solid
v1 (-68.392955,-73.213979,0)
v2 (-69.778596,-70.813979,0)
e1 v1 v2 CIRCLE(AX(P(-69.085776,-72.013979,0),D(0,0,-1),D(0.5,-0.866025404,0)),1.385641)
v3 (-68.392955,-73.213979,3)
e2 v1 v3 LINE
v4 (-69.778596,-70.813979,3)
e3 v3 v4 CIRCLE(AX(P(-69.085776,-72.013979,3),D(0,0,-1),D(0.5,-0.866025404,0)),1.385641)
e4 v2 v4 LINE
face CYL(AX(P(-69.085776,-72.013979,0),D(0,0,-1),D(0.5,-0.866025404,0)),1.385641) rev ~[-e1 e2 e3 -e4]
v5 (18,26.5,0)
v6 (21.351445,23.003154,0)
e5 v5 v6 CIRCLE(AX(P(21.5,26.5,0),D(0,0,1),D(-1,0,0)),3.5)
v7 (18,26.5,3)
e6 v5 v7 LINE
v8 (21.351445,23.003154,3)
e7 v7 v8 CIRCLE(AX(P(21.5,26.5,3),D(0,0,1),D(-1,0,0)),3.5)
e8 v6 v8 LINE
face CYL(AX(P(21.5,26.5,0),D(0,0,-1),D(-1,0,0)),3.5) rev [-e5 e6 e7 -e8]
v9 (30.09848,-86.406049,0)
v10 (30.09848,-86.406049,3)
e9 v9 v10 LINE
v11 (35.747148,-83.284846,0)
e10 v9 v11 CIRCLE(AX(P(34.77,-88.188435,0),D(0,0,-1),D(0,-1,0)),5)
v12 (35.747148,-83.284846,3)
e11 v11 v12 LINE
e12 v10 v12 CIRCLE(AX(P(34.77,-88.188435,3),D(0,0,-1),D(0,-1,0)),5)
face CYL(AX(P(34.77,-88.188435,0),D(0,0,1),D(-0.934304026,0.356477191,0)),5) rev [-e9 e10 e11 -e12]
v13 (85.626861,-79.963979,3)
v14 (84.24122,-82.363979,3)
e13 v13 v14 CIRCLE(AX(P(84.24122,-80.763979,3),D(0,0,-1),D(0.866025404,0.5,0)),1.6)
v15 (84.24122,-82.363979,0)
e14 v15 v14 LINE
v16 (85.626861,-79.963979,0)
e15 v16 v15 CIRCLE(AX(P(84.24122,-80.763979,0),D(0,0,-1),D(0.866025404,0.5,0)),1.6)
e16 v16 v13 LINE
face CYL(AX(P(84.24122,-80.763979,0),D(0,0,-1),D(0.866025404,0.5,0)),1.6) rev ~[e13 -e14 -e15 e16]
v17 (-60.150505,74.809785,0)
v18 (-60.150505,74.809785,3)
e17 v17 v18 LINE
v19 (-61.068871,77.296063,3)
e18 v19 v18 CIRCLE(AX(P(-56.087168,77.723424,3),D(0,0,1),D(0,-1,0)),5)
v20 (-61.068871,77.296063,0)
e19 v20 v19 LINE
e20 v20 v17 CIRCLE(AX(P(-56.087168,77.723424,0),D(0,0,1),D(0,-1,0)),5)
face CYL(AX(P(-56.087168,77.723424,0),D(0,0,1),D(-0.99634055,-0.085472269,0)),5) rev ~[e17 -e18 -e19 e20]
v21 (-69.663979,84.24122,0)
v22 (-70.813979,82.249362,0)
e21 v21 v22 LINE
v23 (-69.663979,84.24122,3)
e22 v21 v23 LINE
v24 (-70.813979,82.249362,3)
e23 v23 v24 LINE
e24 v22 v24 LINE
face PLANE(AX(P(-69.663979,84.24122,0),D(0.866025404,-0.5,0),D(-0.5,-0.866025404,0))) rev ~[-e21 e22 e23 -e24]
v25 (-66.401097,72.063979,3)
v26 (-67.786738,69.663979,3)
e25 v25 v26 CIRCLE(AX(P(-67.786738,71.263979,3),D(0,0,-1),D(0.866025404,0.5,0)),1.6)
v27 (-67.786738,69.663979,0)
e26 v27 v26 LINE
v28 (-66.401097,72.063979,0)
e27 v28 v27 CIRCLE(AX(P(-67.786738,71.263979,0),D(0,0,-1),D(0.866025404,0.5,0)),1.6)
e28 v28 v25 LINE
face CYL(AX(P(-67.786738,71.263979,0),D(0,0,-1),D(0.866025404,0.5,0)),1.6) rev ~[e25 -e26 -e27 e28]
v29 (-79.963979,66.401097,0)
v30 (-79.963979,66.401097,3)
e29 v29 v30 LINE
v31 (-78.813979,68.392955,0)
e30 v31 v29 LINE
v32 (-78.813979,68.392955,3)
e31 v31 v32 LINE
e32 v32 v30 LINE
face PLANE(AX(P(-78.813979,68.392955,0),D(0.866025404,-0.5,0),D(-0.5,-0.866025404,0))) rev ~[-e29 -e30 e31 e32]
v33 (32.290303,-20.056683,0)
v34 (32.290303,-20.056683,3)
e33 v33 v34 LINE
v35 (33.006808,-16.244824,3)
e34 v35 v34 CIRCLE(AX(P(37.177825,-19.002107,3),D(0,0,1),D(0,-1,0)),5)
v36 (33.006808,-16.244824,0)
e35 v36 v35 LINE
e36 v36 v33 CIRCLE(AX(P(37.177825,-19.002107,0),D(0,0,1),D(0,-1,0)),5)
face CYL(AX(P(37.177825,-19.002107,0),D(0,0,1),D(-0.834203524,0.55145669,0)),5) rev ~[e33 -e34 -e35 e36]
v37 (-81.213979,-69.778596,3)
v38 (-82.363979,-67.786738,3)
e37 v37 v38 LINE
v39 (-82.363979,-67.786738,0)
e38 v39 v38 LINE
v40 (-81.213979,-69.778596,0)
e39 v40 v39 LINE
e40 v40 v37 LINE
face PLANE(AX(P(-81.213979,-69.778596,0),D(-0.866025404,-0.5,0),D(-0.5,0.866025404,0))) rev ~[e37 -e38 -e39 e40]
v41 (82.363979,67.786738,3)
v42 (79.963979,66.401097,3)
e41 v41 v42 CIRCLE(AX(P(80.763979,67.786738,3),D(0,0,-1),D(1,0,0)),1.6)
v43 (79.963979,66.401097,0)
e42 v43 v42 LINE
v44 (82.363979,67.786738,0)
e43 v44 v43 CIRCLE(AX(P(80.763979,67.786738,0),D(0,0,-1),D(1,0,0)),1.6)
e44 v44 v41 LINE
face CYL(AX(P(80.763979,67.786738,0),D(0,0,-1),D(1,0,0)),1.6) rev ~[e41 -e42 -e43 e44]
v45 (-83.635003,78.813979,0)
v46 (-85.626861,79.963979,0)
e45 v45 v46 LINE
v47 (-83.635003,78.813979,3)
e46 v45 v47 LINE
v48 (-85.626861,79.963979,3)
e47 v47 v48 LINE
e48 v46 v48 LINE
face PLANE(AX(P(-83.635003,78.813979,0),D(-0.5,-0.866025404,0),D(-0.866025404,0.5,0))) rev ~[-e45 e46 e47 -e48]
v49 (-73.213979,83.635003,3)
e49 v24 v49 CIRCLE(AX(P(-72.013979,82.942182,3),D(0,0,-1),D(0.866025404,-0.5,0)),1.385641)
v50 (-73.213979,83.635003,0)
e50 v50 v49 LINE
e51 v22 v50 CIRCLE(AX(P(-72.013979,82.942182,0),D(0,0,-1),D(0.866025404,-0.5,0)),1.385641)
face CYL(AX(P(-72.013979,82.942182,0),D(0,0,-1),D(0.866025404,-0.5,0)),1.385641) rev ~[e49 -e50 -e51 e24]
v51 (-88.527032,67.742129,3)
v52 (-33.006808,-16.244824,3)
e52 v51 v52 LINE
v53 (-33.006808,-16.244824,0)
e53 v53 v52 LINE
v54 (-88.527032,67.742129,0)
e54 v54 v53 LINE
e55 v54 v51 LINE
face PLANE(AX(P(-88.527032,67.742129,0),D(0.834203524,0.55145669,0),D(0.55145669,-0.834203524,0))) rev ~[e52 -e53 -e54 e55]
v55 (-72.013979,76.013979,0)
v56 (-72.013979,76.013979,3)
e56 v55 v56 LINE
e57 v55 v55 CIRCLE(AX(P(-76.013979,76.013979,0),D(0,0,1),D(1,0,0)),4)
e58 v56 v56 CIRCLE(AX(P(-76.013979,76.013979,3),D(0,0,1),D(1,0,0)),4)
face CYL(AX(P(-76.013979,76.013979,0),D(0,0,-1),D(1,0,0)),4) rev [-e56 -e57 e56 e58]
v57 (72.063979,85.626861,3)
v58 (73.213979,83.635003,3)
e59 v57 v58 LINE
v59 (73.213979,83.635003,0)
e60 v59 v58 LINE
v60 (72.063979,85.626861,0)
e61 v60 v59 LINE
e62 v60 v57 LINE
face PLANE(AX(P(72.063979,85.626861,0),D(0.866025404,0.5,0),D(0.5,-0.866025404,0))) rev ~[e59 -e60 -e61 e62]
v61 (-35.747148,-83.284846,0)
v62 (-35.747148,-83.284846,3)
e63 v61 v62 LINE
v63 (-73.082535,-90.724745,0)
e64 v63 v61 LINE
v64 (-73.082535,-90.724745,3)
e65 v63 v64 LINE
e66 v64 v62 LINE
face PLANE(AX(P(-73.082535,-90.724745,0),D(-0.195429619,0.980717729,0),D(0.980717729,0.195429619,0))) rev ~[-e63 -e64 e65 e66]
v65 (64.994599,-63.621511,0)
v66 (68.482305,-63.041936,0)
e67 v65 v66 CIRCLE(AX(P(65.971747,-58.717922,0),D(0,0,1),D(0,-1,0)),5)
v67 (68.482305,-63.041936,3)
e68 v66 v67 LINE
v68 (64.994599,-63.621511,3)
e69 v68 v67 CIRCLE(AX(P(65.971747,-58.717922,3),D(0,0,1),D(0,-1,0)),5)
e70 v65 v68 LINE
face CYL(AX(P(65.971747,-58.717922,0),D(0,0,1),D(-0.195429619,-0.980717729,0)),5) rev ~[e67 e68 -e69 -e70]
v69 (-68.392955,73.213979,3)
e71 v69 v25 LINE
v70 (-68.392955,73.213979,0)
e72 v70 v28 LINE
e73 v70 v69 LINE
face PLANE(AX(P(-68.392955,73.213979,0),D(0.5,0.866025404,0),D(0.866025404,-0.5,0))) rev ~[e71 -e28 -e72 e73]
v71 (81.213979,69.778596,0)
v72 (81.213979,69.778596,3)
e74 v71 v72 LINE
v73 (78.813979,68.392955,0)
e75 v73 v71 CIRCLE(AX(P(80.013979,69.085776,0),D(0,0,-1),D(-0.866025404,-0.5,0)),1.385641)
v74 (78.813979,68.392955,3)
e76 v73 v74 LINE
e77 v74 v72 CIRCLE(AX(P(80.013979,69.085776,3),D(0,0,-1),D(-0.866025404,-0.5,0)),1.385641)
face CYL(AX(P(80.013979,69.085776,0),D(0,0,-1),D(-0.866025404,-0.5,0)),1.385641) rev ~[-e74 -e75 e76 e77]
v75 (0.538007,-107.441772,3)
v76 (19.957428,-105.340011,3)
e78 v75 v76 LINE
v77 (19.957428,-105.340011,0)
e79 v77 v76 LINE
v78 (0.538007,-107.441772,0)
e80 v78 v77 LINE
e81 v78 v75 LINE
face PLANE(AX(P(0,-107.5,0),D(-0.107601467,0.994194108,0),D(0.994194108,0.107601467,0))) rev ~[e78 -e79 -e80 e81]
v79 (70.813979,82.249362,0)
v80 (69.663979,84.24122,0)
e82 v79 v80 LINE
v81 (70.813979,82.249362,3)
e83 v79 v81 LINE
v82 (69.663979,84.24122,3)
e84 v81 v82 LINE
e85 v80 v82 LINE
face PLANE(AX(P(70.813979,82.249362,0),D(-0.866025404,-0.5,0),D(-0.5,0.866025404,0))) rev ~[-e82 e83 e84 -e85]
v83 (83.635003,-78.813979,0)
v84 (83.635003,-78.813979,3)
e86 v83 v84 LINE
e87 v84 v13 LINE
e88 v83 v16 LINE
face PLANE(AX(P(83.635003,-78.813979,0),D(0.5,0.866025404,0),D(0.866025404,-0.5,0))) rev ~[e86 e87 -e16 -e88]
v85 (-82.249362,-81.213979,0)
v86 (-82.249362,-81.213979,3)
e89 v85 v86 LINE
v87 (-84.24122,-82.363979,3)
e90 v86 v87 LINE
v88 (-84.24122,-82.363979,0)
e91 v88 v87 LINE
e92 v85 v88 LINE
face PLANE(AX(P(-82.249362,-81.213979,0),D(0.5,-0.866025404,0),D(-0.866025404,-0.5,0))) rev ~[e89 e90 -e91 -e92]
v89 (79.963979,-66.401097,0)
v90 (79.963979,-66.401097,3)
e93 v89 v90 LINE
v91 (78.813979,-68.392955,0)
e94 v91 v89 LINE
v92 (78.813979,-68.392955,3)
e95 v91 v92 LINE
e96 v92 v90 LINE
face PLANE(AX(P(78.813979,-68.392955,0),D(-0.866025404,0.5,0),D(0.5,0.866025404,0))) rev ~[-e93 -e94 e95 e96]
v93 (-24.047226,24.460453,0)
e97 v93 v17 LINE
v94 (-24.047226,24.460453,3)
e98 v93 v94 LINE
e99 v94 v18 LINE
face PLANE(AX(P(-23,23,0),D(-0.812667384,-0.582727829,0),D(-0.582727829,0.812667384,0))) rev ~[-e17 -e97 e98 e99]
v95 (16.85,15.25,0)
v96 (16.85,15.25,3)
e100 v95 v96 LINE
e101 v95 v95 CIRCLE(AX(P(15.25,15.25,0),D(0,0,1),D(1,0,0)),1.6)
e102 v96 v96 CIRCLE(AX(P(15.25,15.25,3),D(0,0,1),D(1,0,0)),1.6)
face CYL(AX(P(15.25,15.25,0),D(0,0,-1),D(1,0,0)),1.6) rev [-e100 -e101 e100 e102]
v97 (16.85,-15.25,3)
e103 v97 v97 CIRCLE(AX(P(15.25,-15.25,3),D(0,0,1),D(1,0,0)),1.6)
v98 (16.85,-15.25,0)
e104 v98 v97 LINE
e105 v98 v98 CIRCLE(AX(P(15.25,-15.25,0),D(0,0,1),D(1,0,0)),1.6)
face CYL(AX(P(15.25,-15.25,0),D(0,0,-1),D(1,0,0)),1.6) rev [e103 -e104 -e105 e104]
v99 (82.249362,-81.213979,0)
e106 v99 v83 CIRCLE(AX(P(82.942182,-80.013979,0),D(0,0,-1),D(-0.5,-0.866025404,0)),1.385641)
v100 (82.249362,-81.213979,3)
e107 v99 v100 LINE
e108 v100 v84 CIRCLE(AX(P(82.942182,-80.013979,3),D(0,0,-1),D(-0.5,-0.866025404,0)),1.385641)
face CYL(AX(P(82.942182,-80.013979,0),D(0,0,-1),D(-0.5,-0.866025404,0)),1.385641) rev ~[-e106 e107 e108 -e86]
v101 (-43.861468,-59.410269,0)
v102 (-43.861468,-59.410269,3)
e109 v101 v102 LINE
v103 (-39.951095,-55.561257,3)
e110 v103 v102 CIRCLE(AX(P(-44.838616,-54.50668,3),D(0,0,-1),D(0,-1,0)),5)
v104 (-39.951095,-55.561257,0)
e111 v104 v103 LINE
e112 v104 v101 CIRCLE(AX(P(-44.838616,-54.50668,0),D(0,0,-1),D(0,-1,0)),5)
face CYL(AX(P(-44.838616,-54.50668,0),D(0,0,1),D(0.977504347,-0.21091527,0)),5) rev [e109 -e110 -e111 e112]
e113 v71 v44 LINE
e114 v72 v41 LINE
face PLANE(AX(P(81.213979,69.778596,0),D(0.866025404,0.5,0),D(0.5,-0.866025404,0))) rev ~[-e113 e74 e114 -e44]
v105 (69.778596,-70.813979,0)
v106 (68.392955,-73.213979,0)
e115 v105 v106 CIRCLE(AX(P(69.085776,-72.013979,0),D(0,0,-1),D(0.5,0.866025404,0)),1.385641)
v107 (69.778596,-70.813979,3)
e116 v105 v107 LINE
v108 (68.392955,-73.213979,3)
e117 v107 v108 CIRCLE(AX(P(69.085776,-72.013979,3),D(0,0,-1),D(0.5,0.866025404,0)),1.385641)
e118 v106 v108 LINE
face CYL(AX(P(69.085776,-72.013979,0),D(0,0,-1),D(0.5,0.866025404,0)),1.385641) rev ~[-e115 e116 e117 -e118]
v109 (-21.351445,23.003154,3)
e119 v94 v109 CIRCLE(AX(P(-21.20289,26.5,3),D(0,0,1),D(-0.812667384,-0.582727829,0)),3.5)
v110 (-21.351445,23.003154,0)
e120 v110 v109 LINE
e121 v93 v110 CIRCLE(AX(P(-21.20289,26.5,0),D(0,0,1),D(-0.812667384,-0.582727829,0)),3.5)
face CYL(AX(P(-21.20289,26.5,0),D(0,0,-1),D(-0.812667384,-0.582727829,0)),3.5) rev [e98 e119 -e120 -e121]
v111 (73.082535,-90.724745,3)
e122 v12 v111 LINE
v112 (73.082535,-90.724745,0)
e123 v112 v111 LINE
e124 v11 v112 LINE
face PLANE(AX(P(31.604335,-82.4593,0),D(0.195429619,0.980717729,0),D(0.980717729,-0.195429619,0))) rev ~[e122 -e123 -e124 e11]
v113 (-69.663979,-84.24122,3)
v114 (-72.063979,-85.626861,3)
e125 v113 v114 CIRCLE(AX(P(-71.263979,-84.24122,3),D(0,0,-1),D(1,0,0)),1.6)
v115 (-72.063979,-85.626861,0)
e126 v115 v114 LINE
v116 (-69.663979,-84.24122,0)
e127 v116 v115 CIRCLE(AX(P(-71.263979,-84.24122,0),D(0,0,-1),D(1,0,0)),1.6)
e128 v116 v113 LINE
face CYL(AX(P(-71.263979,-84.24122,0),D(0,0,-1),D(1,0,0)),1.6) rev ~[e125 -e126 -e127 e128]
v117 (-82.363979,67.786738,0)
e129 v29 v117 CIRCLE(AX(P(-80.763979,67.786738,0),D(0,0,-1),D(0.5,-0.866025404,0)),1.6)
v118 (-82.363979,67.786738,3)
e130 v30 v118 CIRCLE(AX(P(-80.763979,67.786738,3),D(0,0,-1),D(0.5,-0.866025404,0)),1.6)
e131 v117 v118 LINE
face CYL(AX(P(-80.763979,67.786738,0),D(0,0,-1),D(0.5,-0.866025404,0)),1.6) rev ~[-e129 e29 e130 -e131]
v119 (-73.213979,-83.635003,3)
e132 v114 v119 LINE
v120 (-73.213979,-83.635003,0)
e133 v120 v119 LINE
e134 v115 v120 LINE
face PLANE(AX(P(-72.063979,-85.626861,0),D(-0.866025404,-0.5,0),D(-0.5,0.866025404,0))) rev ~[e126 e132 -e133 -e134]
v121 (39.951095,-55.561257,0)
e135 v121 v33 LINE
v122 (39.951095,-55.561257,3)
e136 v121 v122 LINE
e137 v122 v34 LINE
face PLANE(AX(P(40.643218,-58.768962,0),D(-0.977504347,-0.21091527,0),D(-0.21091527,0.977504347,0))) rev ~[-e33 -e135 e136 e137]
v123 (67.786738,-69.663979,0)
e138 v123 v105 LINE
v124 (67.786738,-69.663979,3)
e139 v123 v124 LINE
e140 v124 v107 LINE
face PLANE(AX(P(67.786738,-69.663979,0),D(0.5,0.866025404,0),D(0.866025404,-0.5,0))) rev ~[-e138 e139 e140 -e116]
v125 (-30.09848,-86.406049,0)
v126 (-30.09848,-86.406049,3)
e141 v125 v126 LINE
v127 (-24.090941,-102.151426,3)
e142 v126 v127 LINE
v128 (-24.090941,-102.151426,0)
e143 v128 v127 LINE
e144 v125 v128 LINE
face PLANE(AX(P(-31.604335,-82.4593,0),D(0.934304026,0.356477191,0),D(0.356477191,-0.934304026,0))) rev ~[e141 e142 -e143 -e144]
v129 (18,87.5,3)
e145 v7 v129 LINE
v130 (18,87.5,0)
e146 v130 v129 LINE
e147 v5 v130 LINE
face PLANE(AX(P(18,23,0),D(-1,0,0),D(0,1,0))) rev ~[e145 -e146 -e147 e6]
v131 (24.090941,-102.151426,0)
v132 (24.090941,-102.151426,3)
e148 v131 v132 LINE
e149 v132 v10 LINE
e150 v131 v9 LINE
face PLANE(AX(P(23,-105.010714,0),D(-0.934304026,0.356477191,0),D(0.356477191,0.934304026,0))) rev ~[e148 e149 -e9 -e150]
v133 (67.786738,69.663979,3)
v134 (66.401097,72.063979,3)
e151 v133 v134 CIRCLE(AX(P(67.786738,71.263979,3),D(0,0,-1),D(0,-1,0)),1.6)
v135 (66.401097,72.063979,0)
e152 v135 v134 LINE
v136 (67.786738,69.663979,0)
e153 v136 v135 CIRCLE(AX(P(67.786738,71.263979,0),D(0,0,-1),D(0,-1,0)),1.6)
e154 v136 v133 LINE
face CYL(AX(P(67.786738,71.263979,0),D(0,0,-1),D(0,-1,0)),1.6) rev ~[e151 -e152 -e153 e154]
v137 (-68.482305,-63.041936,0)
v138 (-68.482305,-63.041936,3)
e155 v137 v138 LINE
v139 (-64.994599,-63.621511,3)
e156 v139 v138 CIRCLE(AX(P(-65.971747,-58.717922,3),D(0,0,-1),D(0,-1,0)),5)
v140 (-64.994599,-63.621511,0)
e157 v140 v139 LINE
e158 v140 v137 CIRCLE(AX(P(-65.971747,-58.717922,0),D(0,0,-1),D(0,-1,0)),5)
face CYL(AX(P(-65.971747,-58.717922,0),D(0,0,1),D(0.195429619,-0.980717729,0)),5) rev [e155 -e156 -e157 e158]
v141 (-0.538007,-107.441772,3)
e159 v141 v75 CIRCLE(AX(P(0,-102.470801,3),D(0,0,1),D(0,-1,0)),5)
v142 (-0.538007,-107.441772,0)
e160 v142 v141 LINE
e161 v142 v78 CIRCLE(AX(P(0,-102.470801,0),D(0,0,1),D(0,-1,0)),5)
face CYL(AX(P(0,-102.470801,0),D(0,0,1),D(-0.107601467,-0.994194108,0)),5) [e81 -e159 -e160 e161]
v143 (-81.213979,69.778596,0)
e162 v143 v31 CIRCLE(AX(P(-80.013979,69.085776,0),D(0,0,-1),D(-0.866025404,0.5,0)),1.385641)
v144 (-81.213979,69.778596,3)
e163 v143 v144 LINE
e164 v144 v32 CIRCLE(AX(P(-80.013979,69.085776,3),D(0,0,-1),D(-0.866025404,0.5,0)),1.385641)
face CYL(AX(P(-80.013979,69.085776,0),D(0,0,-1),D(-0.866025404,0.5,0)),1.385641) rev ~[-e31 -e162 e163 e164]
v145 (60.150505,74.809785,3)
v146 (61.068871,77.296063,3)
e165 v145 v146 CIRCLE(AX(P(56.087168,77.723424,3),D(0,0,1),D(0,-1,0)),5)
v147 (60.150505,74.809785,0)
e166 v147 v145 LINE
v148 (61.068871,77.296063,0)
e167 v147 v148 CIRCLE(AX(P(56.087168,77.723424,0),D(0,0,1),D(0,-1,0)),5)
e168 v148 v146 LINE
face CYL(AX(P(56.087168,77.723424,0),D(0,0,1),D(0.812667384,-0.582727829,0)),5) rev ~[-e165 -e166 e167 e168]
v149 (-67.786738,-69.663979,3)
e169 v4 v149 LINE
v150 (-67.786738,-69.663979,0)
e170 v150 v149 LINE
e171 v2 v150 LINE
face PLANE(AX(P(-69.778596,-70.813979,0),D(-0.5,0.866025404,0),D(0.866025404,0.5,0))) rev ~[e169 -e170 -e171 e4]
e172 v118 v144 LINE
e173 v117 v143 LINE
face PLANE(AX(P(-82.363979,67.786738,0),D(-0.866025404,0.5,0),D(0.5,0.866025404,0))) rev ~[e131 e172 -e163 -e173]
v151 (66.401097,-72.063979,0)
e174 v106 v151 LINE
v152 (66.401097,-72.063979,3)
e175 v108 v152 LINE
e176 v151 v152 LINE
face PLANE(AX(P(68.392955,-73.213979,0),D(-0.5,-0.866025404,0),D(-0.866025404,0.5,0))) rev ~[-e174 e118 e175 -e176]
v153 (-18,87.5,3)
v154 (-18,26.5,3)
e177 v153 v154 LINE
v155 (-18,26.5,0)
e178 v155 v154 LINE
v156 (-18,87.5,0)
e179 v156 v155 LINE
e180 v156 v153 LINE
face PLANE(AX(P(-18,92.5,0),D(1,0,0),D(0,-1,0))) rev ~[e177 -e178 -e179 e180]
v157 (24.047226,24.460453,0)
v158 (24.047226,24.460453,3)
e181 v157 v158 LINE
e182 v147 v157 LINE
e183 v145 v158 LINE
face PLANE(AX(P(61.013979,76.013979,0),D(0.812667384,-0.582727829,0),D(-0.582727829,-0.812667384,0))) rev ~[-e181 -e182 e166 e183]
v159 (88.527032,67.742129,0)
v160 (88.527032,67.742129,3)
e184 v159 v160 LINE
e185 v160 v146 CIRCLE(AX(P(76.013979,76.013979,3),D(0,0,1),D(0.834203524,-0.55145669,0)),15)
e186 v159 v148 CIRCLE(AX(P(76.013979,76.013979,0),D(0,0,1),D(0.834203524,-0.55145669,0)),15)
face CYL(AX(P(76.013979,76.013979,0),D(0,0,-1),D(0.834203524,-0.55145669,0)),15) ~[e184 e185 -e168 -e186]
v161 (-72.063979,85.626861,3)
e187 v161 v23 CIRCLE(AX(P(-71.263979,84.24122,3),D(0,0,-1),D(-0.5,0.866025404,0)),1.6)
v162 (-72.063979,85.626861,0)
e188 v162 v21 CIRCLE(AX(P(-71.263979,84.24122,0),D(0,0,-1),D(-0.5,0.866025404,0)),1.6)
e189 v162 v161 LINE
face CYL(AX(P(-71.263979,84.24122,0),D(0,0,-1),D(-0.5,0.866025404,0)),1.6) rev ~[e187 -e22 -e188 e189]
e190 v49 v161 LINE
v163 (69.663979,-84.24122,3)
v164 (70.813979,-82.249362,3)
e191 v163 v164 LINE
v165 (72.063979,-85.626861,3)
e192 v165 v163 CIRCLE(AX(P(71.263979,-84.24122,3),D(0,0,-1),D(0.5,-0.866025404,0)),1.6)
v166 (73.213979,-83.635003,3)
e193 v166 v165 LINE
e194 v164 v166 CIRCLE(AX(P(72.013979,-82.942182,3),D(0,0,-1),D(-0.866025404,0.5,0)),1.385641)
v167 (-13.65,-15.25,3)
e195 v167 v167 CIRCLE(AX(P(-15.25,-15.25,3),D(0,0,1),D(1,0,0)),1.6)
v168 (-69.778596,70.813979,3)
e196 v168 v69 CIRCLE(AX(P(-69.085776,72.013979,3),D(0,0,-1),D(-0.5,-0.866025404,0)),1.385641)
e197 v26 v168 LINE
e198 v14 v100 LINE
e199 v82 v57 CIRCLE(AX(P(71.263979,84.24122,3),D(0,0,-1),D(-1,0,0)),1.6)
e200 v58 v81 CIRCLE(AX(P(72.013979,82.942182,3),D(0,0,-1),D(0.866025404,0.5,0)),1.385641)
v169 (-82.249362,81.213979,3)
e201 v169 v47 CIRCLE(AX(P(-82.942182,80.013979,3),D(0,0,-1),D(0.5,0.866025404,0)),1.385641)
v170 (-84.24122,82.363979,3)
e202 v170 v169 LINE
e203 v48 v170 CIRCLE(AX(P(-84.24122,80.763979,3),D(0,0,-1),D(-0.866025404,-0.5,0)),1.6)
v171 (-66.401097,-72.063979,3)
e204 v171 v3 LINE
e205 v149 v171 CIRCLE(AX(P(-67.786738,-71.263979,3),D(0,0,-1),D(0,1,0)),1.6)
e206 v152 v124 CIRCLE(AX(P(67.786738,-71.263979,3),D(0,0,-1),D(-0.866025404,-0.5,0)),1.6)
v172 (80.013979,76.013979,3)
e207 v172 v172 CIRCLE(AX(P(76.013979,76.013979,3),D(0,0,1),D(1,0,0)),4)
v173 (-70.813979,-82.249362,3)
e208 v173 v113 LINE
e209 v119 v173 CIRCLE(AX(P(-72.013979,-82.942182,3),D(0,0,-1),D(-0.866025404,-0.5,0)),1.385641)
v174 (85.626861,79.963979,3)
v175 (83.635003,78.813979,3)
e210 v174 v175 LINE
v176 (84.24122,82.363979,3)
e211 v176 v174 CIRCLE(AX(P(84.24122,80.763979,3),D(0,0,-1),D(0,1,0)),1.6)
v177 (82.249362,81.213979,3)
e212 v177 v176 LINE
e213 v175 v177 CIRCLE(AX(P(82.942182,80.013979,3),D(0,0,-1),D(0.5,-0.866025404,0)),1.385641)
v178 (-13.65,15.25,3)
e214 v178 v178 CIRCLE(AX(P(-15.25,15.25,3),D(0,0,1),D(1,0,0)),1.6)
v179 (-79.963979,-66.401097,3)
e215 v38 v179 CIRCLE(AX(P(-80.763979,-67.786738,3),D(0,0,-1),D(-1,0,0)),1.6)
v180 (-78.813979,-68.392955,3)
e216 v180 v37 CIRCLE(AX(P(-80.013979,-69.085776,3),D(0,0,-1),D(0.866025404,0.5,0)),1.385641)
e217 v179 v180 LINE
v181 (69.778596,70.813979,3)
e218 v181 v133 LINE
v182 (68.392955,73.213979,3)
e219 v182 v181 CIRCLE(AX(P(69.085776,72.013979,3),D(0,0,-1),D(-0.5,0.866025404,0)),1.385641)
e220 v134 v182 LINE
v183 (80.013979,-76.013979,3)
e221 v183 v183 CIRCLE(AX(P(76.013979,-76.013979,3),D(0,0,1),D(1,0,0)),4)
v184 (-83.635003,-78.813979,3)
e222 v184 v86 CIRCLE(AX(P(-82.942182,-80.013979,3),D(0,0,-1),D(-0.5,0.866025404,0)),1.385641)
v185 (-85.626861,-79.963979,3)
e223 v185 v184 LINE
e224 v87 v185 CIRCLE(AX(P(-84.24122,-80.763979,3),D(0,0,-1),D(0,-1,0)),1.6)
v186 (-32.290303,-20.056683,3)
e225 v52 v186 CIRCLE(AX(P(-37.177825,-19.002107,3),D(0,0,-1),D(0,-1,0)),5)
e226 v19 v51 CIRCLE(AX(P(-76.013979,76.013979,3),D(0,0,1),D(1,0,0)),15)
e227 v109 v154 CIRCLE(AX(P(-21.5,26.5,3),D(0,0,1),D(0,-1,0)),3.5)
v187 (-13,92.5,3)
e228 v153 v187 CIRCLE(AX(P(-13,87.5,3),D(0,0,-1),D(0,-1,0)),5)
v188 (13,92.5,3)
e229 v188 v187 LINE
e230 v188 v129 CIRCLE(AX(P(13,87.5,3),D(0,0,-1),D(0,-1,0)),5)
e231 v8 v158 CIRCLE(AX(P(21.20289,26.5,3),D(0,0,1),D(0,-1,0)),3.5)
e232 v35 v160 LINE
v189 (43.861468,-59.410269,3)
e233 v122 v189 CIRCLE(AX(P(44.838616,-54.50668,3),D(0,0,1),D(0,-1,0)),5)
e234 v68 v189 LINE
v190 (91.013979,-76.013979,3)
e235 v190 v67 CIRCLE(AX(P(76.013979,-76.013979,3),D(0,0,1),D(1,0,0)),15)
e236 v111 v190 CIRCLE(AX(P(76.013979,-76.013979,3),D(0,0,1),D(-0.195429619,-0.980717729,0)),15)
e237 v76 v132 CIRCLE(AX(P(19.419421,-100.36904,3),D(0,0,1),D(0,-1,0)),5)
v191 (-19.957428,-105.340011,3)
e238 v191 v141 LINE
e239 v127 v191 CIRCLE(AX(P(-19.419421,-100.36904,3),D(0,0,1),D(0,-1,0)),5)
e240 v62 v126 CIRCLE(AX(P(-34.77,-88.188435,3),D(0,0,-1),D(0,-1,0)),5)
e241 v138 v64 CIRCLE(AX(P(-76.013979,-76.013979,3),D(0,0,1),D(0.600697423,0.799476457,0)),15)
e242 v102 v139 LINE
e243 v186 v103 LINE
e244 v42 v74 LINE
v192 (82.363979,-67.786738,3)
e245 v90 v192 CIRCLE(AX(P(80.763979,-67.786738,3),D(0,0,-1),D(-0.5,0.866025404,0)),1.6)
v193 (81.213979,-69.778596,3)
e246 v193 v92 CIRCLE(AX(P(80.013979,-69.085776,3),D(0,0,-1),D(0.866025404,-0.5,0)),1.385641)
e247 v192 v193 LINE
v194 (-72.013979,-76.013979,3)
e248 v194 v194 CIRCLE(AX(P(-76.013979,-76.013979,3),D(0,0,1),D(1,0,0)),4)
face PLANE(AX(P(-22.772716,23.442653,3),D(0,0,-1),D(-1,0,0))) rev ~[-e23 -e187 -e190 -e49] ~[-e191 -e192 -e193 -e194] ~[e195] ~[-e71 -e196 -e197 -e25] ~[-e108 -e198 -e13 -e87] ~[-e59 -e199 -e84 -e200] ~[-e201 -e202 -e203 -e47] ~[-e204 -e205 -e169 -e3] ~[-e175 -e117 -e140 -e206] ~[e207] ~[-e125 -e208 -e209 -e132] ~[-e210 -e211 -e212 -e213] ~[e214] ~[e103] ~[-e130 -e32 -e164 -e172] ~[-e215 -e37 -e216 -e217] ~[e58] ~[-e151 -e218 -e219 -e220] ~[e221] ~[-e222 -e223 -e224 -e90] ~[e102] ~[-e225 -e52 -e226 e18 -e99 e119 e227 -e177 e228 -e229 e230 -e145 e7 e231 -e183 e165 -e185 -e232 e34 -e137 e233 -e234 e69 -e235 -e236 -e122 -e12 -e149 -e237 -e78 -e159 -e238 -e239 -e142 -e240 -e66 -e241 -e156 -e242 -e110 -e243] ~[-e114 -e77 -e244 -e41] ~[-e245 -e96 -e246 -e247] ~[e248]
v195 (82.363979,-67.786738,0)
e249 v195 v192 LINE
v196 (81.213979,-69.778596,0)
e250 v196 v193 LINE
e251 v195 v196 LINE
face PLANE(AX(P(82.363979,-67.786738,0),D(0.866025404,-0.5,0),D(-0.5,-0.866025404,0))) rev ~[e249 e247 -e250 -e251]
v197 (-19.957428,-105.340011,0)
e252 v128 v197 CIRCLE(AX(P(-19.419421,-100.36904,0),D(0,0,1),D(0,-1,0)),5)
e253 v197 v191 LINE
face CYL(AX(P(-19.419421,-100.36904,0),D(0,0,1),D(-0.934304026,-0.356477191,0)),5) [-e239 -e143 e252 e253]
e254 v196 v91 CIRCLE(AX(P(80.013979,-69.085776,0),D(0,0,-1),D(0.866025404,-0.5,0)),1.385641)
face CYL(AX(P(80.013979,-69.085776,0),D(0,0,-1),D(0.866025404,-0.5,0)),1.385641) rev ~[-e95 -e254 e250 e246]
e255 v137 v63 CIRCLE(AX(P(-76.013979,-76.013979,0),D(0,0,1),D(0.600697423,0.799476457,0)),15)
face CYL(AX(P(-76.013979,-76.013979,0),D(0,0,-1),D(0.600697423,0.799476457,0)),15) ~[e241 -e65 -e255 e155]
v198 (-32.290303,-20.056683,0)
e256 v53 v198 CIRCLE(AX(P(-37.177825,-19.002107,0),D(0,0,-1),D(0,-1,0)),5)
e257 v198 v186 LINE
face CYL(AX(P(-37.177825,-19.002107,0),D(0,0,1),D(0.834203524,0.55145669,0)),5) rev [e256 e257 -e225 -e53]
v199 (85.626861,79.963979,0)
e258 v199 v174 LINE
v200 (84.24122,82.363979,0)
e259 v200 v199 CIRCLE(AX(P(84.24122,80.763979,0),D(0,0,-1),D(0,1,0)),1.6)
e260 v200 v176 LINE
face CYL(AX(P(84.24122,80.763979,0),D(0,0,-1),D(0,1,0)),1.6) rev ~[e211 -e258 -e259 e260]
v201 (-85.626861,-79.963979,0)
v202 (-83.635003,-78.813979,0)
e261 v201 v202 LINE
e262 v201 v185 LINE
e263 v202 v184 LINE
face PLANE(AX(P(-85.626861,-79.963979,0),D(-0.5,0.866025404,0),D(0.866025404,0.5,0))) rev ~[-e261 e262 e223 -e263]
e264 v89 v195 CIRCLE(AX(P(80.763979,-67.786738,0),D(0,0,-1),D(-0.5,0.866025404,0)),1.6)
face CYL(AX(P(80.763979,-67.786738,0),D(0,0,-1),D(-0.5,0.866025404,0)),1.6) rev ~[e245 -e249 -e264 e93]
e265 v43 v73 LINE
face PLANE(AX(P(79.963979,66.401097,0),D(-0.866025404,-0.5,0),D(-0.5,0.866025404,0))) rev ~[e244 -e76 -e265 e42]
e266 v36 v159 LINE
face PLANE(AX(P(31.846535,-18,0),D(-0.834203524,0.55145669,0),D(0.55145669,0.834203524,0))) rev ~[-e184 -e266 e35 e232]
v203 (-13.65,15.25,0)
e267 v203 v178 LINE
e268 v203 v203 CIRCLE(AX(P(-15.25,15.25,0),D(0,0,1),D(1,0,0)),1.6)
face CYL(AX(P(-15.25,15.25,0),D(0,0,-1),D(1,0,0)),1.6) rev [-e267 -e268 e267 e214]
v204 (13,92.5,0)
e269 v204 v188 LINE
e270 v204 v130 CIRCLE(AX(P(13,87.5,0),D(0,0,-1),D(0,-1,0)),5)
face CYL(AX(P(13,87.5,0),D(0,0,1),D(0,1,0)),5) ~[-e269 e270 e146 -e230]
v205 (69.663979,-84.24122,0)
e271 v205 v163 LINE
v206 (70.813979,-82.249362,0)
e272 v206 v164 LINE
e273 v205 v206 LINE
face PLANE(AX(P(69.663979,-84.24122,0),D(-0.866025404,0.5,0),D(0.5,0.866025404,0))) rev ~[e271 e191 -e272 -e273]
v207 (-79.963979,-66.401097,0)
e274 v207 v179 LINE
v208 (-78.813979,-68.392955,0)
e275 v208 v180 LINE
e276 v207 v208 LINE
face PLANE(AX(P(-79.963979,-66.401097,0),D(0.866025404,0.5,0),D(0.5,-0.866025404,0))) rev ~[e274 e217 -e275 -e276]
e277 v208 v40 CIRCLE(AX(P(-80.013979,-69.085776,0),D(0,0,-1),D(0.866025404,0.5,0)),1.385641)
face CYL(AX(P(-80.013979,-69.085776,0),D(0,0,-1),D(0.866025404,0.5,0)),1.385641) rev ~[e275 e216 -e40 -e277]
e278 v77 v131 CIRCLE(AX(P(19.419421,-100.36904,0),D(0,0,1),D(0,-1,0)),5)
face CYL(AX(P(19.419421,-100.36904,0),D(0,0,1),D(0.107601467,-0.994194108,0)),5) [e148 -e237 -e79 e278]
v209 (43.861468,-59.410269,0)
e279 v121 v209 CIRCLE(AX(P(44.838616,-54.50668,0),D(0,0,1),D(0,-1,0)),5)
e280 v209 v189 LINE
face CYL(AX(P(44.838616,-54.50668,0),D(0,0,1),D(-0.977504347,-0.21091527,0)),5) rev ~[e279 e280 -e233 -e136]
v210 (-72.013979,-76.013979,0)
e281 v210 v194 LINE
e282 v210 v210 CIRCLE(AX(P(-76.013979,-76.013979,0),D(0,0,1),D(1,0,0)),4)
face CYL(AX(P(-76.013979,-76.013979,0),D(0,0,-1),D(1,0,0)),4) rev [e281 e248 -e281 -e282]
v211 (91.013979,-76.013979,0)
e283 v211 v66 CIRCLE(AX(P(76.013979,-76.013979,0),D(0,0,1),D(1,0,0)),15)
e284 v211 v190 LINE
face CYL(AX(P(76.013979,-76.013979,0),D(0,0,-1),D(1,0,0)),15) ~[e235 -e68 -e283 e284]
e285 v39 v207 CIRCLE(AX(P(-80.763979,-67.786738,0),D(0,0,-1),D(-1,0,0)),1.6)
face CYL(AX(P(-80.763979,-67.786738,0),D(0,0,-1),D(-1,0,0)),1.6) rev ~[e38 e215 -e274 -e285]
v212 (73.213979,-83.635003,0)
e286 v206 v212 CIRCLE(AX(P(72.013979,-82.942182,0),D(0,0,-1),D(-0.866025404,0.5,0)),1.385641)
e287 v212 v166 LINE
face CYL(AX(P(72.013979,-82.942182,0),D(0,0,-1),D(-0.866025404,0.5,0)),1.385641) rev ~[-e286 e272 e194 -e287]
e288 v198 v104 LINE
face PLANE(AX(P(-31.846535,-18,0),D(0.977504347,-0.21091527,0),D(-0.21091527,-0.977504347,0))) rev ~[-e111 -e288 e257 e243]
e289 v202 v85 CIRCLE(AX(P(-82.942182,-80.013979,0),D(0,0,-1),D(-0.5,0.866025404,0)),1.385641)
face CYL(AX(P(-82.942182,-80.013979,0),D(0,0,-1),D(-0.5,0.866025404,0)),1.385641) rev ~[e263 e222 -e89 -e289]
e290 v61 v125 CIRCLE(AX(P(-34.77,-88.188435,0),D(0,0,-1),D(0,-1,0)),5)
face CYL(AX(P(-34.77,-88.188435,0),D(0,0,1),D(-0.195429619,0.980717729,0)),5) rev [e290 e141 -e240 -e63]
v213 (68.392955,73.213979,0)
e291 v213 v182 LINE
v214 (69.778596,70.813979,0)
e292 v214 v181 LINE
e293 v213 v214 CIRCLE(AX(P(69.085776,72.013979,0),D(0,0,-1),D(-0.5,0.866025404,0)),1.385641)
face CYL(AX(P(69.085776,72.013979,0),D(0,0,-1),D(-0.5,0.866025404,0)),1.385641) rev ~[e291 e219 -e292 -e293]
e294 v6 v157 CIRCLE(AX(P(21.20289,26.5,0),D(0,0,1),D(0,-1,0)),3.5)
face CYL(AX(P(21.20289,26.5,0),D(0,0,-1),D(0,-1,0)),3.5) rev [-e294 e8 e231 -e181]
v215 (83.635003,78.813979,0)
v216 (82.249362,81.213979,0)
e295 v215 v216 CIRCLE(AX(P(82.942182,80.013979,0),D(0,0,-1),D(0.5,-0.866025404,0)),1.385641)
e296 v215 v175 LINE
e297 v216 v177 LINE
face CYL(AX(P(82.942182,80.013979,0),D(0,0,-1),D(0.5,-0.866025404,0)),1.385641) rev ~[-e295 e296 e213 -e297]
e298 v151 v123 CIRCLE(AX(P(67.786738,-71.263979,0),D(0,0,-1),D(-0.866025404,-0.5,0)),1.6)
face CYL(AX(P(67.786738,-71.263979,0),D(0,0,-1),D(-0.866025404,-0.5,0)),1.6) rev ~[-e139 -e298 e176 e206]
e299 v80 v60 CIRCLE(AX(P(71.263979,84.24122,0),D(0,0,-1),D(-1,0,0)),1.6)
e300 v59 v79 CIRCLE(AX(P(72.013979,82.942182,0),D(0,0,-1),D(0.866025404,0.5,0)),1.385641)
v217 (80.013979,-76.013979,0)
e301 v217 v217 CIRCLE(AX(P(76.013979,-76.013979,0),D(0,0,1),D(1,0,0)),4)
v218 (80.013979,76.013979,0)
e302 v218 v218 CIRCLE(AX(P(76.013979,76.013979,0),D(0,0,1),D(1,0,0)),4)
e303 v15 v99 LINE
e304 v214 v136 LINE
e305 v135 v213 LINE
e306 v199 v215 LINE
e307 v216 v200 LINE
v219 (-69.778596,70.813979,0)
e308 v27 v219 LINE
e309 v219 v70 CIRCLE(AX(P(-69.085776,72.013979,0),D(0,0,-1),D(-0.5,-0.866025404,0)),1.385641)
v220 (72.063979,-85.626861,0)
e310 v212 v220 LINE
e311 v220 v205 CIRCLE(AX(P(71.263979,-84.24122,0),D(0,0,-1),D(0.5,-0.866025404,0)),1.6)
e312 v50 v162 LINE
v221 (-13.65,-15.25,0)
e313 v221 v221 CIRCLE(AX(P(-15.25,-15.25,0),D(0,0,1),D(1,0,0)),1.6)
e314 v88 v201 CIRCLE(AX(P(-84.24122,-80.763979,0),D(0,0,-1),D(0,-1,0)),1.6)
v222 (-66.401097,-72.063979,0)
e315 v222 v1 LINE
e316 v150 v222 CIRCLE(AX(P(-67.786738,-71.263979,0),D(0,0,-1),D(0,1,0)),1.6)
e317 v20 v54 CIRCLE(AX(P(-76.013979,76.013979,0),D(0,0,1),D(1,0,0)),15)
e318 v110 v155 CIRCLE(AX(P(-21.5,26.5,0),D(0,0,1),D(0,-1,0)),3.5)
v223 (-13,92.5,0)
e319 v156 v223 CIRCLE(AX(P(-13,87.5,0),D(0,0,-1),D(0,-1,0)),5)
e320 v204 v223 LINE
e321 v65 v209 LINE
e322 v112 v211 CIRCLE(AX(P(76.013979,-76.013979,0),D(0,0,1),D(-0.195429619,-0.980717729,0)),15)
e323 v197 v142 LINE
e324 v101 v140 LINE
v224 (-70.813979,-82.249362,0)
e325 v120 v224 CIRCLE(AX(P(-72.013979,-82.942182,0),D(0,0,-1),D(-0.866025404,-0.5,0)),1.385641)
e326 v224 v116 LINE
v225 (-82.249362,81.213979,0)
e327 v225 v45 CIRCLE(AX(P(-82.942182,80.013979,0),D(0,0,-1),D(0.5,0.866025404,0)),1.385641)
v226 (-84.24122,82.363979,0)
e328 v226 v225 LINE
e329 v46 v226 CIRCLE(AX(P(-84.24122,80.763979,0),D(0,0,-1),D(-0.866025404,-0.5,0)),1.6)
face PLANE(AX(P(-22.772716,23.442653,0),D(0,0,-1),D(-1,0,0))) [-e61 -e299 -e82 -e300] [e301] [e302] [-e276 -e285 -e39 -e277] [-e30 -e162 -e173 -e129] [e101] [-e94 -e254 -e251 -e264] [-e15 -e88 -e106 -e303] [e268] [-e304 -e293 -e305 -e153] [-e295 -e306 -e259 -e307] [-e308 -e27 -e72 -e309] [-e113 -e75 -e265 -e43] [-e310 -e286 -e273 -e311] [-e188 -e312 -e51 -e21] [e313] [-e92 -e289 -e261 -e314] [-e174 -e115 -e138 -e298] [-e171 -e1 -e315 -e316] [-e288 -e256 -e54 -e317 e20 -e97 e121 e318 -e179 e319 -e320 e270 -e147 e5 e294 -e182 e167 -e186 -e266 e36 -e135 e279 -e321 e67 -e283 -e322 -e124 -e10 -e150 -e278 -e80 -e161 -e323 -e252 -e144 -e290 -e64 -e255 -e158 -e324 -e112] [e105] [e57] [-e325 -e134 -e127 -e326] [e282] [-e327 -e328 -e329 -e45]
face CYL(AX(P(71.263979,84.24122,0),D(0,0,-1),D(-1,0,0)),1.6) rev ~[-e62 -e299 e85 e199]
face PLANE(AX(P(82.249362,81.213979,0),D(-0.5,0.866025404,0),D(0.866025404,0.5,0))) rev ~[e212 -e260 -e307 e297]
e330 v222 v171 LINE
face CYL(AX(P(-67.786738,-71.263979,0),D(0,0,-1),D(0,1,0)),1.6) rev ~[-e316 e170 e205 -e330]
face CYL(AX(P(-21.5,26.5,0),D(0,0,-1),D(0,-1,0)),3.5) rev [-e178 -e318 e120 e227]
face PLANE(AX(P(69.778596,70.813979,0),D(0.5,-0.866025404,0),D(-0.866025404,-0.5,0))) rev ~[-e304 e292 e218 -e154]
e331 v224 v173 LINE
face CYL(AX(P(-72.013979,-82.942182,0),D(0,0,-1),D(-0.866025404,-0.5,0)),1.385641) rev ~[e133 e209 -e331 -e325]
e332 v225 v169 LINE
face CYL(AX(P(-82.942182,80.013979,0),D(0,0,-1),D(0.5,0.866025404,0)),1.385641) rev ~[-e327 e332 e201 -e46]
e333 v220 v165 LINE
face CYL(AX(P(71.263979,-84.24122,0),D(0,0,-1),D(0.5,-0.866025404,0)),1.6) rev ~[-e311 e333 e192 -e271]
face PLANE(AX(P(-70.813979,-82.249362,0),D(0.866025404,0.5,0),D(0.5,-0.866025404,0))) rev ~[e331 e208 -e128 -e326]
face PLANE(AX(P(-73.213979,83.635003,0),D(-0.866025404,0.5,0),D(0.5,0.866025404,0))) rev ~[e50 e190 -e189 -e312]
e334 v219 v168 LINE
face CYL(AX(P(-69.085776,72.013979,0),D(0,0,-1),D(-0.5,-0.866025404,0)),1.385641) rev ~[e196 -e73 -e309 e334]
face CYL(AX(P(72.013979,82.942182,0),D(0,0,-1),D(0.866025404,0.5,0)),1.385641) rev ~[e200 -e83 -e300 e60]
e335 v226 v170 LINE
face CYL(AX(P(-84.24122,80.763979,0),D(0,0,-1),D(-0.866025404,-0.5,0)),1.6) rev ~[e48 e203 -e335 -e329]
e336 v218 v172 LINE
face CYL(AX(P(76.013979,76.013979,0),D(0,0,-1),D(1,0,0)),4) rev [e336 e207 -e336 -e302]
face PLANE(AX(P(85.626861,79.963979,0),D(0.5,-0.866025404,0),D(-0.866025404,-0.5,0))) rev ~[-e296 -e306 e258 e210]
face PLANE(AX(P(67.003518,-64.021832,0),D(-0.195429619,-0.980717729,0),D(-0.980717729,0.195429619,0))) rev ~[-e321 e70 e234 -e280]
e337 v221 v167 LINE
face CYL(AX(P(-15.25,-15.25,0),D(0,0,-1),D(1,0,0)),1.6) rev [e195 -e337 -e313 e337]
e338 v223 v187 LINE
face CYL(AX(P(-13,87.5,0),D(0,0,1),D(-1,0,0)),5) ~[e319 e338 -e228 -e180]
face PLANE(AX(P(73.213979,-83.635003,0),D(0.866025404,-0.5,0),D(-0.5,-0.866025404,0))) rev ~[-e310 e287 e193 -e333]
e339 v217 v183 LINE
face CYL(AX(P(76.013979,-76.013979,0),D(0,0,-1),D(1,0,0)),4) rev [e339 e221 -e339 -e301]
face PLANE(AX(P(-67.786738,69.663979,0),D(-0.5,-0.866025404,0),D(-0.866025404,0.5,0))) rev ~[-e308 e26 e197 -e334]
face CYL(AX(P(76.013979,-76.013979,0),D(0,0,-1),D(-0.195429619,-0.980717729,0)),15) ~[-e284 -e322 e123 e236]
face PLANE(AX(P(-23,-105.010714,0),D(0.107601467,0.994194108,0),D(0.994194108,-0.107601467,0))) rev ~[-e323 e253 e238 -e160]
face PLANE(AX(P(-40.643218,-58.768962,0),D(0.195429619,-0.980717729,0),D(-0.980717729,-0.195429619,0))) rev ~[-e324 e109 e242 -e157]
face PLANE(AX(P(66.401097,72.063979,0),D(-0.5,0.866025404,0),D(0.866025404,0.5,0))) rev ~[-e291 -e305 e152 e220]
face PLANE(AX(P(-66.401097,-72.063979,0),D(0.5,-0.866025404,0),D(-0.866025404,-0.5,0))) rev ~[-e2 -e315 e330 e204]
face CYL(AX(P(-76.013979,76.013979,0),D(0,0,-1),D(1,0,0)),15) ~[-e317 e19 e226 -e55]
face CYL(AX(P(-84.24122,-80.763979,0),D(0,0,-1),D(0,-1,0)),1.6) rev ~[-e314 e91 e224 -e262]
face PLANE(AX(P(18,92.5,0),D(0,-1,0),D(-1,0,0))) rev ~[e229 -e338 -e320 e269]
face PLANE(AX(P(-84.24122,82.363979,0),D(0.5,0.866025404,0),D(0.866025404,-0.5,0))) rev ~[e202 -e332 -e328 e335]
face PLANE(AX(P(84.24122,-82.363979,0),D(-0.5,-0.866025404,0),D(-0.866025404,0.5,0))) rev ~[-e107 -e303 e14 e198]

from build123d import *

# Parameters (mm, degrees)
F0_R        = 4
F0_R_2      = 1.6
F1_DEPTH    = 3
F2_R        = 5
F3_T1_DEPTH = 3


# Not quite as in the source:
# - a fillet or chamfer that OpenCascade refuses, or shapes differently, is made with other operations: its cross-section is extruded or revolved along the edge and cut away or added


with BuildPart() as f1:
    # F0 (on Top) → F1 (new body)
    with BuildSketch(Plane.XY):
        with BuildLine():
            ThreePointArc((-88.527031831, 67.7421286231), (-71.6951708551, 61.6491644503), (-61.0139789776, 76.0139789776))
            ThreePointArc((-61.0139789776, 76.0139789776), (-80.3327871, 90.3787935048), (-88.527031831, 67.7421286231))
        make_face()
        with BuildLine():
            ThreePointArc((-81.2139789776, 69.7785960703), (-79.3211586545, 70.2857757473), (-78.8139789776, 68.3929554243))
            Line((-78.8139789776, 68.3929554243), (-79.9639789776, 66.4010969955))
            ThreePointArc((-79.9639789776, 66.4010969955), (-81.5639789776, 66.4010969955), (-82.3639789776, 67.7867376416))
            Line((-82.3639789776, 67.7867376416), (-81.2139789776, 69.7785960703))
        make_face(mode=Mode.SUBTRACT)
        with BuildLine():
            ThreePointArc((-69.7785960703, 70.8139789776), (-70.2857757473, 72.7067993006), (-68.3929554243, 73.2139789776))
            Line((-68.3929554243, 73.2139789776), (-66.4010969955, 72.0639789776))
            ThreePointArc((-66.4010969955, 72.0639789776), (-66.4010969955, 70.4639789776), (-67.7867376416, 69.6639789776))
            Line((-67.7867376416, 69.6639789776), (-69.7785960703, 70.8139789776))
        make_face(mode=Mode.SUBTRACT)
        with Locations((-76.0139789776, 76.0139789776)):
            Circle(F0_R, mode=Mode.SUBTRACT)
        with BuildLine():
            ThreePointArc((-82.2493618848, 81.2139789776), (-81.7421822078, 79.3211586545), (-83.6350025309, 78.8139789776))
            Line((-83.6350025309, 78.8139789776), (-85.6268609596, 79.9639789776))
            ThreePointArc((-85.6268609596, 79.9639789776), (-85.6268609596, 81.5639789776), (-84.2412203135, 82.3639789776))
            Line((-84.2412203135, 82.3639789776), (-82.2493618848, 81.2139789776))
        make_face(mode=Mode.SUBTRACT)
        with BuildLine():
            ThreePointArc((-70.8139789776, 82.2493618848), (-72.7067993006, 81.7421822078), (-73.2139789776, 83.6350025309))
            Line((-73.2139789776, 83.6350025309), (-72.0639789776, 85.6268609596))
            ThreePointArc((-72.0639789776, 85.6268609596), (-70.4639789776, 85.6268609596), (-69.6639789776, 84.2412203135))
            Line((-69.6639789776, 84.2412203135), (-70.8139789776, 82.2493618848))
        make_face(mode=Mode.SUBTRACT)
        with BuildLine():
            Line((-23, 23), (-61.0139789776, 76.0139789776))
            ThreePointArc((-61.0139789776, 76.0139789776), (-71.6951708551, 61.6491644503), (-88.527031831, 67.7421286231))
            Line((-88.527031831, 67.7421286231), (-31.8465346459, -18))
            Line((-31.8465346459, -18), (-40.6432183342, -58.7689615944))
            Line((-40.6432183342, -58.7689615944), (-67.0035176261, -64.0218321208))
            ThreePointArc((-67.0035176261, -64.0218321208), (-62.5946473945, -69.3116256696), (-61.0139789776, -76.0139789776))
            ThreePointArc((-61.0139789776, -76.0139789776), (-64.4171763077, -85.5278723886), (-73.0825346892, -90.7247449122))
            Line((-73.0825346892, -90.7247449122), (-31.6043349446, -82.4592995729))
            Line((-31.6043349446, -82.4592995729), (-23, -105.0107137391))
            Line((-23, -105.0107137391), (0, -107.5))
            Line((0, -107.5), (23, -105.0107137391))
            Line((23, -105.0107137391), (31.6043349446, -82.4592995729))
            Line((31.6043349446, -82.4592995729), (73.0825346892, -90.7247449122))
            ThreePointArc((73.0825346892, -90.7247449122), (61.3881912906, -79.3435937504), (67.0035176261, -64.0218321208))
            Line((67.0035176261, -64.0218321208), (40.6432183342, -58.7689615944))
            Line((40.6432183342, -58.7689615944), (31.8465346459, -18))
            Line((31.8465346459, -18), (88.527031831, 67.7421286231))
            ThreePointArc((88.527031831, 67.7421286231), (71.6951708551, 61.6491644503), (61.0139789776, 76.0139789776))
            Line((61.0139789776, 76.0139789776), (23, 23))
            Line((23, 23), (18, 23))
            Line((18, 23), (18, 92.5))
            Line((18, 92.5), (0, 92.5))
            Line((0, 92.5), (-18, 92.5))
            Line((-18, 92.5), (-18, 23))
            Line((-18, 23), (-23, 23))
        make_face()
        with Locations((-15.25, -15.25)):
            Circle(F0_R_2, mode=Mode.SUBTRACT)
        with Locations((15.25, -15.25)):
            Circle(F0_R_2, mode=Mode.SUBTRACT)
        with Locations((-15.25, 15.25)):
            Circle(F0_R_2, mode=Mode.SUBTRACT)
        with Locations((15.25, 15.25)):
            Circle(F0_R_2, mode=Mode.SUBTRACT)
        with BuildLine():
            ThreePointArc((-61.0139789776, -76.0139789776), (-62.5946473945, -69.3116256696), (-67.0035176261, -64.0218321208))
            ThreePointArc((-67.0035176261, -64.0218321208), (-90.6397666645, -72.6843642047), (-73.0825346892, -90.7247449122))
            ThreePointArc((-73.0825346892, -90.7247449122), (-64.4171763077, -85.5278723886), (-61.0139789776, -76.0139789776))
        make_face()
        with BuildLine():
            Line((-70.8139789776, -82.2493618848), (-69.6639789776, -84.2412203135))
            ThreePointArc((-69.6639789776, -84.2412203135), (-70.4639789776, -85.6268609596), (-72.0639789776, -85.6268609596))
            Line((-72.0639789776, -85.6268609596), (-73.2139789776, -83.6350025309))
            ThreePointArc((-73.2139789776, -83.6350025309), (-72.7067993006, -81.7421822078), (-70.8139789776, -82.2493618848))
        make_face(mode=Mode.SUBTRACT)
        with BuildLine():
            Line((-85.6268609596, -79.9639789776), (-83.6350025309, -78.8139789776))
            ThreePointArc((-83.6350025309, -78.8139789776), (-81.7421822078, -79.3211586545), (-82.2493618848, -81.2139789776))
            Line((-82.2493618848, -81.2139789776), (-84.2412203135, -82.3639789776))
            ThreePointArc((-84.2412203135, -82.3639789776), (-85.6268609596, -81.5639789776), (-85.6268609596, -79.9639789776))
        make_face(mode=Mode.SUBTRACT)
        with Locations((-76.0139789776, -76.0139789776)):
            Circle(F0_R, mode=Mode.SUBTRACT)
        with BuildLine():
            Line((-66.4010969955, -72.0639789776), (-68.3929554243, -73.2139789776))
            ThreePointArc((-68.3929554243, -73.2139789776), (-70.2857757473, -72.7067993006), (-69.7785960703, -70.8139789776))
            Line((-69.7785960703, -70.8139789776), (-67.7867376416, -69.6639789776))
            ThreePointArc((-67.7867376416, -69.6639789776), (-66.4010969955, -70.4639789776), (-66.4010969955, -72.0639789776))
        make_face(mode=Mode.SUBTRACT)
        with BuildLine():
            Line((-79.9639789776, -66.4010969955), (-78.8139789776, -68.3929554243))
            ThreePointArc((-78.8139789776, -68.3929554243), (-79.3211586545, -70.2857757473), (-81.2139789776, -69.7785960703))
            Line((-81.2139789776, -69.7785960703), (-82.3639789776, -67.7867376416))
            ThreePointArc((-82.3639789776, -67.7867376416), (-81.5639789776, -66.4010969955), (-79.9639789776, -66.4010969955))
        make_face(mode=Mode.SUBTRACT)
        with BuildLine():
            ThreePointArc((91.0139789776, 76.0139789776), (76.0139789776, 91.0139789776), (61.0139789776, 76.0139789776))
            ThreePointArc((61.0139789776, 76.0139789776), (71.6951708551, 61.6491644503), (88.527031831, 67.7421286231))
            ThreePointArc((88.527031831, 67.7421286231), (90.3787935048, 71.6951708551), (91.0139789776, 76.0139789776))
        make_face()
        with BuildLine():
            Line((66.4010969955, 72.0639789776), (68.3929554243, 73.2139789776))
            ThreePointArc((68.3929554243, 73.2139789776), (70.2857757473, 72.7067993006), (69.7785960703, 70.8139789776))
            Line((69.7785960703, 70.8139789776), (67.7867376416, 69.6639789776))
            ThreePointArc((67.7867376416, 69.6639789776), (66.4010969955, 70.4639789776), (66.4010969955, 72.0639789776))
        make_face(mode=Mode.SUBTRACT)
        with Locations((76.0139789776, 76.0139789776)):
            Circle(F0_R, mode=Mode.SUBTRACT)
        with BuildLine():
            Line((79.9639789776, 66.4010969955), (78.8139789776, 68.3929554243))
            ThreePointArc((78.8139789776, 68.3929554243), (79.3211586545, 70.2857757473), (81.2139789776, 69.7785960703))
            Line((81.2139789776, 69.7785960703), (82.3639789776, 67.7867376416))
            ThreePointArc((82.3639789776, 67.7867376416), (81.5639789776, 66.4010969955), (79.9639789776, 66.4010969955))
        make_face(mode=Mode.SUBTRACT)
        with BuildLine():
            ThreePointArc((73.2139789776, 83.6350025309), (72.7067993006, 81.7421822078), (70.8139789776, 82.2493618848))
            Line((70.8139789776, 82.2493618848), (69.6639789776, 84.2412203135))
            ThreePointArc((69.6639789776, 84.2412203135), (70.4639789776, 85.6268609596), (72.0639789776, 85.6268609596))
            Line((72.0639789776, 85.6268609596), (73.2139789776, 83.6350025309))
        make_face(mode=Mode.SUBTRACT)
        with BuildLine():
            Line((85.6268609596, 79.9639789776), (83.6350025309, 78.8139789776))
            ThreePointArc((83.6350025309, 78.8139789776), (81.7421822078, 79.3211586545), (82.2493618848, 81.2139789776))
            Line((82.2493618848, 81.2139789776), (84.2412203135, 82.3639789776))
            ThreePointArc((84.2412203135, 82.3639789776), (85.6268609596, 81.5639789776), (85.6268609596, 79.9639789776))
        make_face(mode=Mode.SUBTRACT)
        with BuildLine():
            ThreePointArc((67.0035176261, -64.0218321208), (61.3881912906, -79.3435937504), (73.0825346892, -90.7247449122))
            ThreePointArc((73.0825346892, -90.7247449122), (85.5278723886, -87.6107816474), (91.0139789776, -76.0139789776))
            ThreePointArc((91.0139789776, -76.0139789776), (82.7163322855, -62.5946473945), (67.0035176261, -64.0218321208))
        make_face()
        with BuildLine():
            ThreePointArc((70.8139789776, -82.2493618848), (72.7067993006, -81.7421822078), (73.2139789776, -83.6350025309))
            Line((73.2139789776, -83.6350025309), (72.0639789776, -85.6268609596))
            ThreePointArc((72.0639789776, -85.6268609596), (70.4639789776, -85.6268609596), (69.6639789776, -84.2412203135))
            Line((69.6639789776, -84.2412203135), (70.8139789776, -82.2493618848))
        make_face(mode=Mode.SUBTRACT)
        with BuildLine():
            ThreePointArc((69.7785960703, -70.8139789776), (70.2857757473, -72.7067993006), (68.3929554243, -73.2139789776))
            Line((68.3929554243, -73.2139789776), (66.4010969955, -72.0639789776))
            ThreePointArc((66.4010969955, -72.0639789776), (66.4010969955, -70.4639789776), (67.7867376416, -69.6639789776))
            Line((67.7867376416, -69.6639789776), (69.7785960703, -70.8139789776))
        make_face(mode=Mode.SUBTRACT)
        with Locations((76.0139789776, -76.0139789776)):
            Circle(F0_R, mode=Mode.SUBTRACT)
        with BuildLine():
            ThreePointArc((82.2493618848, -81.2139789776), (81.7421822078, -79.3211586545), (83.6350025309, -78.8139789776))
            Line((83.6350025309, -78.8139789776), (85.6268609596, -79.9639789776))
            ThreePointArc((85.6268609596, -79.9639789776), (85.6268609596, -81.5639789776), (84.2412203135, -82.3639789776))
            Line((84.2412203135, -82.3639789776), (82.2493618848, -81.2139789776))
        make_face(mode=Mode.SUBTRACT)
        with BuildLine():
            ThreePointArc((81.2139789776, -69.7785960703), (79.3211586545, -70.2857757473), (78.8139789776, -68.3929554243))
            Line((78.8139789776, -68.3929554243), (79.9639789776, -66.4010969955))
            ThreePointArc((79.9639789776, -66.4010969955), (81.5639789776, -66.4010969955), (82.3639789776, -67.7867376416))
            Line((82.3639789776, -67.7867376416), (81.2139789776, -69.7785960703))
        make_face(mode=Mode.SUBTRACT)
    extrude(amount=F1_DEPTH)

    # F2
    f2_edges = [f1.edges().sort_by_distance(p)[0] for p in [
        (-31.846535, -18, 1.5),
        (31.846535, -18, 1.5),
        (40.643218, -58.768962, 1.5),
        (-40.643218, -58.768962, 1.5),
        (-31.604335, -82.4593, 1.5),
        (31.604335, -82.4593, 1.5),
        (23, -105.010714, 1.5),
        (-23, -105.010714, 1.5),
        (0, -107.5, 1.5),
        (67.003518, -64.021832, 1.5),
        (-67.003518, -64.021832, 1.5),
        (61.013979, 76.013979, 1.5),
        (-61.013979, 76.013979, 1.5),
        (18, 92.5, 1.5),
        (-18, 92.5, 1.5),
    ]]
    fillet(f2_edges, radius=F2_R)

    # F3: fillet of radius 3.5 on 4 edges, made by hand

    # F3_s2 → F3_t1 (join)
    with BuildSketch(Plane.XY):
        with BuildLine():
            ThreePointArc((-24.0472259483, 24.4604525993), (-22.8015745775, 23.3864476958), (-21.2028901031, 23))
            Line((-21.2028901031, 23), (-23, 23))
            Line((-23, 23), (-24.0472259483, 24.4604525993))
        make_face()
        with BuildLine():
            ThreePointArc((-21.5, 23), (-19.0251262658, 24.0251262658), (-18, 26.5))
            Line((-18, 26.5), (-18, 23))
            Line((-18, 23), (-21.5, 23))
        make_face()
        with BuildLine():
            ThreePointArc((18, 26.5), (19.0251262658, 24.0251262658), (21.5, 23))
            Line((21.5, 23), (18, 23))
            Line((18, 23), (18, 26.5))
        make_face()
        with BuildLine():
            ThreePointArc((21.2028901031, 23), (22.8015745775, 23.3864476958), (24.0472259483, 24.4604525993))
            Line((24.0472259483, 24.4604525993), (23, 23))
            Line((23, 23), (21.2028901031, 23))
        make_face()
    extrude(amount=F3_T1_DEPTH)


solid = f1.part
